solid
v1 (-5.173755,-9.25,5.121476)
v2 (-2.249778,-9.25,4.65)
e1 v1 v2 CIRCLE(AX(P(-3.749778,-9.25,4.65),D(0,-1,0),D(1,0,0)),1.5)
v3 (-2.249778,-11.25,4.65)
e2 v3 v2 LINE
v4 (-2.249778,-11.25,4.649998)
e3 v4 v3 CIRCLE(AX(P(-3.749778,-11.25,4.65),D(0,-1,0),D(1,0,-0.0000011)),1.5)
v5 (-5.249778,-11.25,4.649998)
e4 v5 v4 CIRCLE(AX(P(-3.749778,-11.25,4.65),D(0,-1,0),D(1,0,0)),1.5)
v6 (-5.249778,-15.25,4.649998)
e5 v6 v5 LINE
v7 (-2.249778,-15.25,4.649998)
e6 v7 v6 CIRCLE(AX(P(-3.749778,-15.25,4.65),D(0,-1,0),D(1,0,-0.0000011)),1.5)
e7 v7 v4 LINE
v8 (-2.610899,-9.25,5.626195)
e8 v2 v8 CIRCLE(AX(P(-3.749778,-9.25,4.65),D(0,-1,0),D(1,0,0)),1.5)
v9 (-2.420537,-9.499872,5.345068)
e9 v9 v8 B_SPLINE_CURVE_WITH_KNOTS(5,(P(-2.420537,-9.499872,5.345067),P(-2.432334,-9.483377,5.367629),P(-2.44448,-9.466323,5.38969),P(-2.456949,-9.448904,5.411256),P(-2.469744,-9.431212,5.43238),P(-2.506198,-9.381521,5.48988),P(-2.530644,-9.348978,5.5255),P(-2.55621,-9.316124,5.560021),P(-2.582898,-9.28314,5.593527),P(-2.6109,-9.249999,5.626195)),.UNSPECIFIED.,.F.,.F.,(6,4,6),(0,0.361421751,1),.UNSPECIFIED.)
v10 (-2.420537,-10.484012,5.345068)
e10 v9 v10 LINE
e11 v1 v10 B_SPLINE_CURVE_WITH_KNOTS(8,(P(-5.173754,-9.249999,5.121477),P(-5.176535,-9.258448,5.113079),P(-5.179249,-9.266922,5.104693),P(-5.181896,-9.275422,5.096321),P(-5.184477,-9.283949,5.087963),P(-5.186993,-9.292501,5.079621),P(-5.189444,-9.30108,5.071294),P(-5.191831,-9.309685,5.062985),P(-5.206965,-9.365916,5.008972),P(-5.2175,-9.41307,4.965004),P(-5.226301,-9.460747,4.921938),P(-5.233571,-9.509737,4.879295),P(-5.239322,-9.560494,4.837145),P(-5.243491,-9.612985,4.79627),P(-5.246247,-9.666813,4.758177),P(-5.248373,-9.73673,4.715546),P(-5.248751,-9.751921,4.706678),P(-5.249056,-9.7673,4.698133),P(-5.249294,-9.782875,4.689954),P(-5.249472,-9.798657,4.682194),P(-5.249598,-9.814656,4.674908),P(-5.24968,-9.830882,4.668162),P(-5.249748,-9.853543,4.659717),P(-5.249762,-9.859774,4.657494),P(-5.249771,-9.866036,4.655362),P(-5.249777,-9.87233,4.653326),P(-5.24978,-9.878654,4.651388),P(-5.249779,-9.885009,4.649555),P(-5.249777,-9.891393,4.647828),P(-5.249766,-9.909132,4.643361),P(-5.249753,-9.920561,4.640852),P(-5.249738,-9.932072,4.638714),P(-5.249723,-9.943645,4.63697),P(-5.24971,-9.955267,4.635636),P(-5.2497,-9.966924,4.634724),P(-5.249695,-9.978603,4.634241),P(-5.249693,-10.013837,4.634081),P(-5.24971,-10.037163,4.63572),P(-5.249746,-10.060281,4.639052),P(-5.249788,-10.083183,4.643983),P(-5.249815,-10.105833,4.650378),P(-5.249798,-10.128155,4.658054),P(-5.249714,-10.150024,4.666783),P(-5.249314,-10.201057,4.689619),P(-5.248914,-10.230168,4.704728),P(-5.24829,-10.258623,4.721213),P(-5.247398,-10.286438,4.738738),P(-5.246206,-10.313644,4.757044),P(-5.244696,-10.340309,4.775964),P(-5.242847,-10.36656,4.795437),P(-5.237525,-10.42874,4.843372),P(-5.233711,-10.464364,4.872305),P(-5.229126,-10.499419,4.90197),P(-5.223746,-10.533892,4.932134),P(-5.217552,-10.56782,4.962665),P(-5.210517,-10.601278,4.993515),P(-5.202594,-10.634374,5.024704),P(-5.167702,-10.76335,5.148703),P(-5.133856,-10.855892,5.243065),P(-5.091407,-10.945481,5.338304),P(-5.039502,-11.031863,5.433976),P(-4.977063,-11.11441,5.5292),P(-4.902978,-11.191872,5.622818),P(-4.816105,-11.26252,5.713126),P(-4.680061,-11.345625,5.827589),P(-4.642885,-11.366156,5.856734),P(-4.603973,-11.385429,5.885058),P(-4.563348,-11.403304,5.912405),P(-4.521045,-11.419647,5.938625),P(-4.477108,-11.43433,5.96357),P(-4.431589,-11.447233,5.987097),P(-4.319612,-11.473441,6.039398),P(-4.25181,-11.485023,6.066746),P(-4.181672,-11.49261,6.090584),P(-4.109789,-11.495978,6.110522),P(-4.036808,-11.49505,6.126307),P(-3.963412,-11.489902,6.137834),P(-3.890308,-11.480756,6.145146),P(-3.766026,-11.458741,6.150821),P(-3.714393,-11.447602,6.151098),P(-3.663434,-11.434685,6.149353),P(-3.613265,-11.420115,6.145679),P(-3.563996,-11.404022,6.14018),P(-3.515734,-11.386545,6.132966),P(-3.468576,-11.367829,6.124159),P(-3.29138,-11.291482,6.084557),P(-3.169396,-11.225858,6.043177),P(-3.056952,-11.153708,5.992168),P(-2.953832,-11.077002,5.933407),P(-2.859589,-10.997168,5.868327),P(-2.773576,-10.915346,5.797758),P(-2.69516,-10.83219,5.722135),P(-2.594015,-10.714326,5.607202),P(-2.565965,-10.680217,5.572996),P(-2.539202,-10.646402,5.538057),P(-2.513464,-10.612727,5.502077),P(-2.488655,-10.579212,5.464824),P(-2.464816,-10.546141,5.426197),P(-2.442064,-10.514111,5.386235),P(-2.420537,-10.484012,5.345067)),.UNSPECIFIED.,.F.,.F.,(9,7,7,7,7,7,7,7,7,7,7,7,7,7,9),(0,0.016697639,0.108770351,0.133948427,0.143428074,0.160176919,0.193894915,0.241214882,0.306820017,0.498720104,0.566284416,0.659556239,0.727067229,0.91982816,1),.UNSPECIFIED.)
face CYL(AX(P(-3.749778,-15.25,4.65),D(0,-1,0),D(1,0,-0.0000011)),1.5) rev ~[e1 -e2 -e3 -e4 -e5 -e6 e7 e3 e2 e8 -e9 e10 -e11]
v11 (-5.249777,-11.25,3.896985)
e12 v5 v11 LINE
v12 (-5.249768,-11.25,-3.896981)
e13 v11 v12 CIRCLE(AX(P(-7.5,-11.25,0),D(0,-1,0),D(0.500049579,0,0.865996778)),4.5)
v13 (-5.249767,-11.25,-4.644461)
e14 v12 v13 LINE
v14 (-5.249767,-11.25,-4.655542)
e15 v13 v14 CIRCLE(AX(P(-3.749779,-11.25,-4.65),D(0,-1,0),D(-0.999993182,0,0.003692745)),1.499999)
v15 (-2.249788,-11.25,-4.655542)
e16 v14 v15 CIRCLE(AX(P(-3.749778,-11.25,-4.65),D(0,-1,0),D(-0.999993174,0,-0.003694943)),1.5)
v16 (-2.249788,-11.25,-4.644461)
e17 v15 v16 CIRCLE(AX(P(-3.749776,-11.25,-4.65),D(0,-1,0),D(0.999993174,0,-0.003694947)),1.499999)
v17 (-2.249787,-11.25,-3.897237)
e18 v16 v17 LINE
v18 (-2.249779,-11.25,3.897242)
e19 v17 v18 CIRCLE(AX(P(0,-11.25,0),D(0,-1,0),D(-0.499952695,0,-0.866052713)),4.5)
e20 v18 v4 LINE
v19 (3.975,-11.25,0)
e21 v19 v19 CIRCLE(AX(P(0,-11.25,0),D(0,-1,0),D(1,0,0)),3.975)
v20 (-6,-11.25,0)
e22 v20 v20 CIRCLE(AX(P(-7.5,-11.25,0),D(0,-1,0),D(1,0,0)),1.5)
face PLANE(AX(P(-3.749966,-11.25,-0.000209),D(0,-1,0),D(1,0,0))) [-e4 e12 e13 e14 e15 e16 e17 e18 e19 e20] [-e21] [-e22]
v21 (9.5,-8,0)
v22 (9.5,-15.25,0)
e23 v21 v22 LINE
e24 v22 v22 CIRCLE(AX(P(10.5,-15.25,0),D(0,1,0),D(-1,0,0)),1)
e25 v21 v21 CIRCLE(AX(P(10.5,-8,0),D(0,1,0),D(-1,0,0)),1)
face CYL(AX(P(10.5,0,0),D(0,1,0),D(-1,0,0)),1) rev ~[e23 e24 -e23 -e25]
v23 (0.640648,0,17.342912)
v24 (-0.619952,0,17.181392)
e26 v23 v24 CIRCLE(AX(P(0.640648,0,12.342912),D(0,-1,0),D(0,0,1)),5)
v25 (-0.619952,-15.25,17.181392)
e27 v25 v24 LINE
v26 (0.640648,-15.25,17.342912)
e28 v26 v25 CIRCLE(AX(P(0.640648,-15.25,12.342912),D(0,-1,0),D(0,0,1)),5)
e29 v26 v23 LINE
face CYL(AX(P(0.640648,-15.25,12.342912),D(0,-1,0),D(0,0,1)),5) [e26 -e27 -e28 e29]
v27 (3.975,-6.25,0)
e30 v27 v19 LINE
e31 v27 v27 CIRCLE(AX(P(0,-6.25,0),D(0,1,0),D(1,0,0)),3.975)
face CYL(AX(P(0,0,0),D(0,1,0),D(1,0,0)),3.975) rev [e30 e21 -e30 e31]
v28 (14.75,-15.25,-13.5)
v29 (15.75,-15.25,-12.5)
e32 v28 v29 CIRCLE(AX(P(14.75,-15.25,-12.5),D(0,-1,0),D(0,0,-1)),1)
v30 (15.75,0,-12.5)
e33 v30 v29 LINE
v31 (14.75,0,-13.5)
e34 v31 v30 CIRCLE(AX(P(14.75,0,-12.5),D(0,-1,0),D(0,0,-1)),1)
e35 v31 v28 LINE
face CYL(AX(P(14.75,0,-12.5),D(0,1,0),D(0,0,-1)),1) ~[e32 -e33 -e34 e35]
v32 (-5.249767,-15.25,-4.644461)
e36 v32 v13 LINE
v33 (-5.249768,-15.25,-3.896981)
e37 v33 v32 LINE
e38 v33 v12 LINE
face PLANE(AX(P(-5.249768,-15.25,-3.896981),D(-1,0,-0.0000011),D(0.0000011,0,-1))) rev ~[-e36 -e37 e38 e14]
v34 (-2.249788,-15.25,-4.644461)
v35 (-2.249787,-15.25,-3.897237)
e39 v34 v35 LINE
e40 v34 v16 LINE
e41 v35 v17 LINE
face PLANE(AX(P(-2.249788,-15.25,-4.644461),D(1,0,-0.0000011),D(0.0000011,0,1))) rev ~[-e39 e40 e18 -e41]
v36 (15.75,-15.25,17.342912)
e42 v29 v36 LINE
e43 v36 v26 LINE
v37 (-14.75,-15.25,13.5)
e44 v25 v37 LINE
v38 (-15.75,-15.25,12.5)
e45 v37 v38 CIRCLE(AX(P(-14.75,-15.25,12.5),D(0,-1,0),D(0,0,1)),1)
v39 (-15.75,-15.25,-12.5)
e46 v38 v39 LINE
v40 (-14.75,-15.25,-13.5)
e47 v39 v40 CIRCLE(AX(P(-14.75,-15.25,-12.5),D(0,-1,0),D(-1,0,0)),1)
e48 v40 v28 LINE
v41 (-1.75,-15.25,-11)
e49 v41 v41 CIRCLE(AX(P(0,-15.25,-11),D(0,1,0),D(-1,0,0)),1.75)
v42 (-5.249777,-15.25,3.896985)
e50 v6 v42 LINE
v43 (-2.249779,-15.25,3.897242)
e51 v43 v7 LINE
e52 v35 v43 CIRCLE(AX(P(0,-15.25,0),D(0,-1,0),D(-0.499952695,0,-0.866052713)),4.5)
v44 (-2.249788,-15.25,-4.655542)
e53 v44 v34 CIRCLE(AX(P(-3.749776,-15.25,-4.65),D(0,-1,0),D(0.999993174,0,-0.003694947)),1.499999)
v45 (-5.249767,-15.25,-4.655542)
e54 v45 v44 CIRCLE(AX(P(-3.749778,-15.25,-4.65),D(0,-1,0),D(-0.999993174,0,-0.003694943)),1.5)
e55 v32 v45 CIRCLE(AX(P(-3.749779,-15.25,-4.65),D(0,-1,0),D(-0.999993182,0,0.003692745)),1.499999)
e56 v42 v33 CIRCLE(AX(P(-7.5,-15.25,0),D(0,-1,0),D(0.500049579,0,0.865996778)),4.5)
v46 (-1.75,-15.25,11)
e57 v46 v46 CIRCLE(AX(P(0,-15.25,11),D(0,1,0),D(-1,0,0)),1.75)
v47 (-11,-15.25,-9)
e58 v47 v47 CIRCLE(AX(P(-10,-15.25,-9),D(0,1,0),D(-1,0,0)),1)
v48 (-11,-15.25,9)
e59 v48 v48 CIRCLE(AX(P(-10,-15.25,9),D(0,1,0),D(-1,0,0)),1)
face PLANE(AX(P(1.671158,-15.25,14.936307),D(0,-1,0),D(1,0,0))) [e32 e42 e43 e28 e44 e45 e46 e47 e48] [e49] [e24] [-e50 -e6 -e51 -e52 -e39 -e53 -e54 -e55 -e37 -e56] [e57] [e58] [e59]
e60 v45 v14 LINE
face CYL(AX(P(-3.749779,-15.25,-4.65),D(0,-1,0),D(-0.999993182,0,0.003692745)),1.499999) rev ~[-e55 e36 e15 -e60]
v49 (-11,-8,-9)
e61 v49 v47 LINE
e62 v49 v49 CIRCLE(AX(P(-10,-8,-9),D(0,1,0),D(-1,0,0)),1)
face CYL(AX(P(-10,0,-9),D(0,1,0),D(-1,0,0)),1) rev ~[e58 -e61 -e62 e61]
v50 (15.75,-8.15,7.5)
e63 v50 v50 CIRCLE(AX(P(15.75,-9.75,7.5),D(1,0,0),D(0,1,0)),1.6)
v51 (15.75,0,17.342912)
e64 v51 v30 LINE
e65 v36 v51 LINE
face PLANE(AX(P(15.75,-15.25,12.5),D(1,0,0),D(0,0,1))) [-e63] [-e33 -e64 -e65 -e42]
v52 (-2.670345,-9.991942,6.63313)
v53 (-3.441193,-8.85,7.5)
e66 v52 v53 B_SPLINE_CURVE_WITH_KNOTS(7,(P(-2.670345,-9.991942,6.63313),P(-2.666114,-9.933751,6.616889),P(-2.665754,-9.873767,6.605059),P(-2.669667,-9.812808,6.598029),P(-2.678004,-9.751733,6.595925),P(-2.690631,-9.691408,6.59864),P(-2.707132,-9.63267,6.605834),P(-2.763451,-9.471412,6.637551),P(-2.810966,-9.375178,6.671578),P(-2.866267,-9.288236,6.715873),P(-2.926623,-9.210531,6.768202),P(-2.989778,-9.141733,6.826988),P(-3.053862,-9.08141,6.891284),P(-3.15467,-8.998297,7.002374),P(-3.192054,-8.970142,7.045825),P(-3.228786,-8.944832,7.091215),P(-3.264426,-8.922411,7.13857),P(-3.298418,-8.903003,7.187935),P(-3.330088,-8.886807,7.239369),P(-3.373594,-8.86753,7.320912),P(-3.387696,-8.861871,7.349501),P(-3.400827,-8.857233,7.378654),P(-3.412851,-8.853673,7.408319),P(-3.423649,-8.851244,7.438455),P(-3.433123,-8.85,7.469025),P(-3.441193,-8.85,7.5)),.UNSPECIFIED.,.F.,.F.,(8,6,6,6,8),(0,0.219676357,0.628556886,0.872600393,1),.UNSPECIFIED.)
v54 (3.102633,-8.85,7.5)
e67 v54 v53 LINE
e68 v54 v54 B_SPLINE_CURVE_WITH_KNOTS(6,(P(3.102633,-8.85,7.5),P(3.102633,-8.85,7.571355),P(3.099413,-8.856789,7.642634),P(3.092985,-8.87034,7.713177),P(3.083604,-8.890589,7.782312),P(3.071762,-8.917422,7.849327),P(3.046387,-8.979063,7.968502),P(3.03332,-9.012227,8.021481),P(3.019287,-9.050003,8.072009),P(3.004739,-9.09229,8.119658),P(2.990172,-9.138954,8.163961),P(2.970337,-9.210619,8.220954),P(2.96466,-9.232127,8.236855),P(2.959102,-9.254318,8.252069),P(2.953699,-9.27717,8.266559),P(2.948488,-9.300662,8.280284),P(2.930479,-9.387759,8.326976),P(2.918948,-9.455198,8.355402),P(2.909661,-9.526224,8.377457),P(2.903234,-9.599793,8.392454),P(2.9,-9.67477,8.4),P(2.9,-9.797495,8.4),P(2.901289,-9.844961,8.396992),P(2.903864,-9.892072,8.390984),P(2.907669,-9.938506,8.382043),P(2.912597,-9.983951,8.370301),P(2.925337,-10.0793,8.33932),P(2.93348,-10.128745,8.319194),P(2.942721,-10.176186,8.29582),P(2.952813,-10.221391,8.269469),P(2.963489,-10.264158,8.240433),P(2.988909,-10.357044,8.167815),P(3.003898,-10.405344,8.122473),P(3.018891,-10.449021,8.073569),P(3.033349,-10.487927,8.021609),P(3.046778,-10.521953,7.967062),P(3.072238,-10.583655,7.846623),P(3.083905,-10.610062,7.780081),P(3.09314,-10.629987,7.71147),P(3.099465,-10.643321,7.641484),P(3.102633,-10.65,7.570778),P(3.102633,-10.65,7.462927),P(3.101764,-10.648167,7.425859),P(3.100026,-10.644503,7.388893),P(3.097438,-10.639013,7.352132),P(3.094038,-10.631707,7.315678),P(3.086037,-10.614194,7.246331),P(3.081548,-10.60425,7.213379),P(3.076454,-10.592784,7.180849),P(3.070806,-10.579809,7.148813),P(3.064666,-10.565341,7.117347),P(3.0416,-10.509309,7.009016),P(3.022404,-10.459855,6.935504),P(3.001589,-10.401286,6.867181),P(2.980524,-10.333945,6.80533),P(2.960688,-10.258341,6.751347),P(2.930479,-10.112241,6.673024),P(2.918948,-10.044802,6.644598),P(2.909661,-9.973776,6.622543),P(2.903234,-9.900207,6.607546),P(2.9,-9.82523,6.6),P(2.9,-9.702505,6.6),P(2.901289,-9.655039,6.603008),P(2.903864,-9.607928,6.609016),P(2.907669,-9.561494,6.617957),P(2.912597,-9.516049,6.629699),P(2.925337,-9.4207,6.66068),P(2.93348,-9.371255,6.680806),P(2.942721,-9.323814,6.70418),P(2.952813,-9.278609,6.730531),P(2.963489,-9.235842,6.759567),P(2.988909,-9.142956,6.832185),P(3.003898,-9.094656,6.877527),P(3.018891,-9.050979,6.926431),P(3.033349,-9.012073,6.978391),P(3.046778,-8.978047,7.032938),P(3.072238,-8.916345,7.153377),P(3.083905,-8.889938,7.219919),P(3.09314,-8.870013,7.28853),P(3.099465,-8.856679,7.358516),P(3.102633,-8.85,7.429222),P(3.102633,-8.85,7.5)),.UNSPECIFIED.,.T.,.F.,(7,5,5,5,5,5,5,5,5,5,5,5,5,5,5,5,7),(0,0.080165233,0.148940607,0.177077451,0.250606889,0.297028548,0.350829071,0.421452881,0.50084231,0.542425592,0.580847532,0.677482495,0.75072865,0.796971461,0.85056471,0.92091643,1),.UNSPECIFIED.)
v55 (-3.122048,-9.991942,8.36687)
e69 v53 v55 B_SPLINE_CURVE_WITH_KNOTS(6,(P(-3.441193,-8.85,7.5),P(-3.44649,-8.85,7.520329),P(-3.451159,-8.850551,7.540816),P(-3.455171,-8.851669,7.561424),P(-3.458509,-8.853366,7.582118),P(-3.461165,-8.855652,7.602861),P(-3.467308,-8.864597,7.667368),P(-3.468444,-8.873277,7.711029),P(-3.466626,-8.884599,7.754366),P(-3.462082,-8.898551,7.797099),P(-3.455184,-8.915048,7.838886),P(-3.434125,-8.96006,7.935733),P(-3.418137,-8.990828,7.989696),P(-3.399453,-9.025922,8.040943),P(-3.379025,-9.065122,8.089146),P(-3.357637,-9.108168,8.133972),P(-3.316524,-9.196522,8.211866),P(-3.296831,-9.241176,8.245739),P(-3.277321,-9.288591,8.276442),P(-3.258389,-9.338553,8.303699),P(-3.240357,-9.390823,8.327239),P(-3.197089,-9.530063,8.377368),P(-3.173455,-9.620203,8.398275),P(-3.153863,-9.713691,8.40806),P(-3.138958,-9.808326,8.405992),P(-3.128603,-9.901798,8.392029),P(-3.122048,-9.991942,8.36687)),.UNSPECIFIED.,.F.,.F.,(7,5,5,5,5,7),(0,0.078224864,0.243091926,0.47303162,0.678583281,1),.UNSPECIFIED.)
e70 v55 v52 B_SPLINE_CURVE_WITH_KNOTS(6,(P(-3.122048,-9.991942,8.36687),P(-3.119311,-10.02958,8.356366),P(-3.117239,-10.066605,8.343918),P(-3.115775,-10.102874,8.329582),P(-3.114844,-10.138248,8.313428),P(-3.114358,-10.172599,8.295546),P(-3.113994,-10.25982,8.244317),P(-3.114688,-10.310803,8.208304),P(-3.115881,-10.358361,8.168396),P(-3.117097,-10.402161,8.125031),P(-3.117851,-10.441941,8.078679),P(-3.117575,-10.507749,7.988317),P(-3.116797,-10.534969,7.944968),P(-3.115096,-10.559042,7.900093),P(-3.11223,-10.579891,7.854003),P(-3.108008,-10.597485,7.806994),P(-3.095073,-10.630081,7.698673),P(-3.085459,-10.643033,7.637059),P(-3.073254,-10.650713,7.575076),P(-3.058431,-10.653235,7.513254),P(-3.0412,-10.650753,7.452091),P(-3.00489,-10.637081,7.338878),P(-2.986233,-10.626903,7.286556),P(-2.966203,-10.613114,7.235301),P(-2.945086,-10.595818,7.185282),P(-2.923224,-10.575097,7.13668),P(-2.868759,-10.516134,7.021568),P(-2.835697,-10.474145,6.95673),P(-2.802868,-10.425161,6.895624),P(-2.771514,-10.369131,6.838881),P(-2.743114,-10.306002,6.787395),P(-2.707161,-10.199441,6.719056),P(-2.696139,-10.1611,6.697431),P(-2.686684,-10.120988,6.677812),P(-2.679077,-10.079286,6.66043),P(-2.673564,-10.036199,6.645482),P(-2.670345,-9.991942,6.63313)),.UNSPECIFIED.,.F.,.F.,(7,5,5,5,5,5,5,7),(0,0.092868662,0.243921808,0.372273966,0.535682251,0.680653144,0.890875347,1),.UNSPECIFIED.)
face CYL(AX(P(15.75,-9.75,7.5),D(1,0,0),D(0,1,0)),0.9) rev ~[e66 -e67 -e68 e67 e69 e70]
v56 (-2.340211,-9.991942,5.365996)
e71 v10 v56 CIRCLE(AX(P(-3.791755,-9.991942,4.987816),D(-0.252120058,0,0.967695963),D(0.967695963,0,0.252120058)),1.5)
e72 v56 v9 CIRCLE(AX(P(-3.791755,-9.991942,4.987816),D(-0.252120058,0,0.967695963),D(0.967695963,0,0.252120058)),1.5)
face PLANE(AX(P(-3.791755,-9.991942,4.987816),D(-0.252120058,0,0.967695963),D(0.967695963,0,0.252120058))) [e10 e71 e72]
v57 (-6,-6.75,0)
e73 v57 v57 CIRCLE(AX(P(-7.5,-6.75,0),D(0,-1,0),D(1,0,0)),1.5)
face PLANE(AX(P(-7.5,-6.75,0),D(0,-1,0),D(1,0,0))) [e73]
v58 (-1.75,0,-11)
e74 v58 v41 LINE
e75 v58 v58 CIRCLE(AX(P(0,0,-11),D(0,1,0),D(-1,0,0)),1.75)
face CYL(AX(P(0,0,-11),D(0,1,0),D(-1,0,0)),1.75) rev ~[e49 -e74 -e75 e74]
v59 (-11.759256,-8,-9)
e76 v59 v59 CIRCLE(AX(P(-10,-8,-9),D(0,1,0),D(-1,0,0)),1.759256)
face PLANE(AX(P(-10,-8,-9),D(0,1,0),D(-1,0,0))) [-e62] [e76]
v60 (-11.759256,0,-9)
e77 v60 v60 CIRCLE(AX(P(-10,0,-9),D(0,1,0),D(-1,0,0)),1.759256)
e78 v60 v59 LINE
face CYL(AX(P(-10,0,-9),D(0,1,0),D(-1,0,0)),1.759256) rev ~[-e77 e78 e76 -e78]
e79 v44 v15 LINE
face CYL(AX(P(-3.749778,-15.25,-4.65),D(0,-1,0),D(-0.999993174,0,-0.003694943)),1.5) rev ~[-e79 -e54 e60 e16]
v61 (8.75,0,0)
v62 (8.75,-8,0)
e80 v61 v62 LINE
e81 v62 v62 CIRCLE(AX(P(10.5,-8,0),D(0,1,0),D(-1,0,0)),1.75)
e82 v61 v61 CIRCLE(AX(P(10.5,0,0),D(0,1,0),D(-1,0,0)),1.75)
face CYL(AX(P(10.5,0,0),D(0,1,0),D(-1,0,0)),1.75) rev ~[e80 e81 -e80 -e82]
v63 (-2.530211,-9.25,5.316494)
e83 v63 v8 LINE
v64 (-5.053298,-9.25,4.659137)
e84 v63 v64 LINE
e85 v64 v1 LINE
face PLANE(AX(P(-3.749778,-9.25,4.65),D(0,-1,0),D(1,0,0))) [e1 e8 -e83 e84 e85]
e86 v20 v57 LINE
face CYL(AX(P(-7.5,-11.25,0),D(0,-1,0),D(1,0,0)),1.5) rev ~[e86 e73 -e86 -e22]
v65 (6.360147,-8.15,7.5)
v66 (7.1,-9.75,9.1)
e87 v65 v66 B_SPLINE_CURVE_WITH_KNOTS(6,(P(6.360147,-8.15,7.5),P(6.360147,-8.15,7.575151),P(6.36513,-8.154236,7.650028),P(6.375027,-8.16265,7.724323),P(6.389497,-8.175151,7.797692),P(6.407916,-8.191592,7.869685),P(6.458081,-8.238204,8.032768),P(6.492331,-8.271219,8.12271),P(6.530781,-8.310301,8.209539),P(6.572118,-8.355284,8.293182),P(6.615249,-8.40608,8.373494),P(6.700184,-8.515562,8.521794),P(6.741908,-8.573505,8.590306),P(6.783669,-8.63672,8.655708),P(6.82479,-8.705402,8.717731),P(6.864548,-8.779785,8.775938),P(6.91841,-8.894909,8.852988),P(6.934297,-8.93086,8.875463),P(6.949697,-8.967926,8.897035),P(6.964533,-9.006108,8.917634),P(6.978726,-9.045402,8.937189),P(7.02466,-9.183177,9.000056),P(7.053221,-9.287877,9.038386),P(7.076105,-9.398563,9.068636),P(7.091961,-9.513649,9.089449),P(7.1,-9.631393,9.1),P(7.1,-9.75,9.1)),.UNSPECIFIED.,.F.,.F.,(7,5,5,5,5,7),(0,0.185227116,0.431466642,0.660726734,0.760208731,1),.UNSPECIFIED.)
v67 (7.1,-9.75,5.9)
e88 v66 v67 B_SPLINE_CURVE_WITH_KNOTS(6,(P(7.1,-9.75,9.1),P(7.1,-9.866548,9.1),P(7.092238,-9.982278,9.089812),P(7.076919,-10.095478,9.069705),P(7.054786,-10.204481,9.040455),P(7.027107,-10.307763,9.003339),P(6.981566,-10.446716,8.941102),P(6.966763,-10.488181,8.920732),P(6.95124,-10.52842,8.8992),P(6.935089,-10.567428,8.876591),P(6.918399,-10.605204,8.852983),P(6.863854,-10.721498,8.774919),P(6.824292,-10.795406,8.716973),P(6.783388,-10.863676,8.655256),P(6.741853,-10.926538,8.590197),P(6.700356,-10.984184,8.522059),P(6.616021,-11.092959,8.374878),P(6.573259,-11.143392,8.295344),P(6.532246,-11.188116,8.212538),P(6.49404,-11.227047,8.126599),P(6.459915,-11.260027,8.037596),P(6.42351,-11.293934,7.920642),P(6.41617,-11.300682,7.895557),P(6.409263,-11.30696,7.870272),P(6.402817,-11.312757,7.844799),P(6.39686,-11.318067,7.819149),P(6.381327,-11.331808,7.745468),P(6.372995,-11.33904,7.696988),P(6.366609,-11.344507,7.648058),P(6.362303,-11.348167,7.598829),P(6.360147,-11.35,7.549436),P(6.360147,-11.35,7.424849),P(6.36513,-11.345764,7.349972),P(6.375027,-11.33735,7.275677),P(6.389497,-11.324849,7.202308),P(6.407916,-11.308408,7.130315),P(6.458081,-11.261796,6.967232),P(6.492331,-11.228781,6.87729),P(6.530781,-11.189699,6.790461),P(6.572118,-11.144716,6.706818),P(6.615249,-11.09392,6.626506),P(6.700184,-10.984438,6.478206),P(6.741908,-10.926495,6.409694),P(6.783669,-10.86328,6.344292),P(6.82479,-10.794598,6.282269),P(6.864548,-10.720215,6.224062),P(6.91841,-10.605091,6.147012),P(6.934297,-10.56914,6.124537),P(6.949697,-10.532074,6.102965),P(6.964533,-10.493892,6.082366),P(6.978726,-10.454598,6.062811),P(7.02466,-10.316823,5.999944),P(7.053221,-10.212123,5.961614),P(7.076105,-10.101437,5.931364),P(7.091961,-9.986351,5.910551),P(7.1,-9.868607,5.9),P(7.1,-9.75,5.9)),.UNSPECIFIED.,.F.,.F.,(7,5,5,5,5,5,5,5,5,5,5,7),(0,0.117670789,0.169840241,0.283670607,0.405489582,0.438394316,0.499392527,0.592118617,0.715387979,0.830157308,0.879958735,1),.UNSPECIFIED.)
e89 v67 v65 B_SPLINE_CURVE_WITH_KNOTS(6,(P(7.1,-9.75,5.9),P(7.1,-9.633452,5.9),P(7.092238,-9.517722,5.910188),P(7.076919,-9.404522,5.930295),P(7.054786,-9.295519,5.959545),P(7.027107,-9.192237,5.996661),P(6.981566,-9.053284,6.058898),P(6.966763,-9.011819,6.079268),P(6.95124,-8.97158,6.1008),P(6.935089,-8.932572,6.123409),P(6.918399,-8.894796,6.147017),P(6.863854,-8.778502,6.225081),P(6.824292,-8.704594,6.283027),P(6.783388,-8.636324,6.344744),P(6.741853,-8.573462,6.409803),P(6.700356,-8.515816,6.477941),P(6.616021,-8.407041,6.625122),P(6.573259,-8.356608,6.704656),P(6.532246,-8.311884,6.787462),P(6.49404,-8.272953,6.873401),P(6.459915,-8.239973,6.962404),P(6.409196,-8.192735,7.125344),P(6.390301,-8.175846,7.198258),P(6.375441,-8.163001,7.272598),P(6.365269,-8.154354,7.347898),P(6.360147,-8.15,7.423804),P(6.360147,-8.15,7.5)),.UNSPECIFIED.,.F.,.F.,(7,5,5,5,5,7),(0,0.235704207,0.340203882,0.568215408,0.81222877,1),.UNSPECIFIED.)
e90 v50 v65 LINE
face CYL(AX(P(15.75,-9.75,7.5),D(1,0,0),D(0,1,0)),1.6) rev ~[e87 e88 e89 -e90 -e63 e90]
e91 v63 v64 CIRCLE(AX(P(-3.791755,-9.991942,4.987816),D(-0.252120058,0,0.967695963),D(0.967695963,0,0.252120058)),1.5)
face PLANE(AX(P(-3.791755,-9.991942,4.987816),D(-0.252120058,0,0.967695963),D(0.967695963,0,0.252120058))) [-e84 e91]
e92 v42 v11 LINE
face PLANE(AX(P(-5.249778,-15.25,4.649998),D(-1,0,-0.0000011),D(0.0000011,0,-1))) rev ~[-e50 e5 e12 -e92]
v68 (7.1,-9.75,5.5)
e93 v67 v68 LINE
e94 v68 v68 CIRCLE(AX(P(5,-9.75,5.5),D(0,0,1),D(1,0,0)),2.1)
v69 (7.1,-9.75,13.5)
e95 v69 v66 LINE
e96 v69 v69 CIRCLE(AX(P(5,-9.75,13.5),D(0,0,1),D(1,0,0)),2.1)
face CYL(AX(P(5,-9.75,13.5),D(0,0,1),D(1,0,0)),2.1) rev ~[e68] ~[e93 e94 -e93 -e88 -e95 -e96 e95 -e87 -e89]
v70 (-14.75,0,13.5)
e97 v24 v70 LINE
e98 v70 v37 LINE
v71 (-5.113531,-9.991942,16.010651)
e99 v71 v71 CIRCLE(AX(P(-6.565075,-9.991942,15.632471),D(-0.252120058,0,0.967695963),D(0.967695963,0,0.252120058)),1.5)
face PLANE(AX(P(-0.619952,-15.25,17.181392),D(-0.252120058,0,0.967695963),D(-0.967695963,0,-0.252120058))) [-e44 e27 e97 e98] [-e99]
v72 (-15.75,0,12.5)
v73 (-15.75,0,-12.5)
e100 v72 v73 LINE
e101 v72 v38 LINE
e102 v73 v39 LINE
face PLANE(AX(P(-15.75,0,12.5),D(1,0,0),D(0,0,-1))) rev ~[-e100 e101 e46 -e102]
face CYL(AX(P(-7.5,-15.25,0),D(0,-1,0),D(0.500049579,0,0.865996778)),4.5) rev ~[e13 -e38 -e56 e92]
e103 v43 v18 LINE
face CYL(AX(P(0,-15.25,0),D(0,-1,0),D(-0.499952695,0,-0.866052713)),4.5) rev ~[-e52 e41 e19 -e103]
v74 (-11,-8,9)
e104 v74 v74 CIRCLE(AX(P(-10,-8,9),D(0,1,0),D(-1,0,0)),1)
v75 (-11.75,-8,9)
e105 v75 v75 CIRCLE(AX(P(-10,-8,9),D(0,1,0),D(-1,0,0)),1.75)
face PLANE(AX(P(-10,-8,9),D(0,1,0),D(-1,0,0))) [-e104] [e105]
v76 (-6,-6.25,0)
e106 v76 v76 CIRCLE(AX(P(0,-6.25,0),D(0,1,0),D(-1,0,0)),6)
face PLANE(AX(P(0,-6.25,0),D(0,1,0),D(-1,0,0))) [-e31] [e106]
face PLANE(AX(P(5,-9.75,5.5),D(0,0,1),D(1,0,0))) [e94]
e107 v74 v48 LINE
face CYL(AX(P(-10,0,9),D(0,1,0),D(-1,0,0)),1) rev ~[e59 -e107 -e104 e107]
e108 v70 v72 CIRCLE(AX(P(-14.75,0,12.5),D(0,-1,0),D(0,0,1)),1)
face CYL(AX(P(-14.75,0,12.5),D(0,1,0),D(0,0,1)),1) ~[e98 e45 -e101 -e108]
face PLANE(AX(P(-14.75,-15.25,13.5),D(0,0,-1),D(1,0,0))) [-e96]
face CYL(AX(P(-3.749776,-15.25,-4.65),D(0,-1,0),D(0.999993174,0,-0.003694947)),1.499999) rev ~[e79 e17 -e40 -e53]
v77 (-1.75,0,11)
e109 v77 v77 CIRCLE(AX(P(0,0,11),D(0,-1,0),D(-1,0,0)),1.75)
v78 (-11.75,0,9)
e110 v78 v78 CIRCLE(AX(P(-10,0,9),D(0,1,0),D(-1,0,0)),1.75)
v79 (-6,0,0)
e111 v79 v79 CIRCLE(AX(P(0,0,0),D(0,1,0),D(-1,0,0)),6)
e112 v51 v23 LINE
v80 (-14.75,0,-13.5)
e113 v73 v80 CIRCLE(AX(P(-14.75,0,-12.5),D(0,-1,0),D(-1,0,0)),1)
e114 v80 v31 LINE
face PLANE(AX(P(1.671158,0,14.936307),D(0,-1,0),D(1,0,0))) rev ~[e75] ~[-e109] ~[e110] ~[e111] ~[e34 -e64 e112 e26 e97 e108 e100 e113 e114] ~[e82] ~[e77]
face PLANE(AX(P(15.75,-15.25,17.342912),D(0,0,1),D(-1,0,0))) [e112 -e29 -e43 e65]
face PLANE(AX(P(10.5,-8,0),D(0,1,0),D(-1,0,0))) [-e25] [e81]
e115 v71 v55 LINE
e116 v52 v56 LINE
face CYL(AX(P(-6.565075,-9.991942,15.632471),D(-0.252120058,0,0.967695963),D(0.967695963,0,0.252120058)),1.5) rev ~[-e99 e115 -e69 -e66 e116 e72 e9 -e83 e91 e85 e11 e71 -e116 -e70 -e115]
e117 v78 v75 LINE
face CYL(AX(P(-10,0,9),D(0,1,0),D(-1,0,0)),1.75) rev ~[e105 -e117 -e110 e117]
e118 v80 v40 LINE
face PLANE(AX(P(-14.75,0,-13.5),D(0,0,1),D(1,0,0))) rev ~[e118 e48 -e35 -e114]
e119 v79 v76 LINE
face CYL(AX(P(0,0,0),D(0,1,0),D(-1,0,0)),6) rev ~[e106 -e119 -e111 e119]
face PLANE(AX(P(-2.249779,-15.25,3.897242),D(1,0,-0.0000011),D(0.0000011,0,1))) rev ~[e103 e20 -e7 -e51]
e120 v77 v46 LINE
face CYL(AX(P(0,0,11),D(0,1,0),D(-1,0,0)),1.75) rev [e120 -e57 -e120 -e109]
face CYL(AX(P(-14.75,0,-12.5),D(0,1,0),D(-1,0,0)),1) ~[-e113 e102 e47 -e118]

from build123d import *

# Parameters (mm, degrees)
F0_R             = 6
F0_R_2           = 3.975
F1_DEPTH         = 15.25
F2_R             = 6
F2_R_2           = 3.975
F3_DEPTH         = 6.25
F4_R             = 3.975
F5_DEPTH         = 4
F6_R             = 1.5
F7_DEPTH         = 4.5
F8_R             = 1.75
F9_DEPTH         = 15.251
F10_R            = 1
F11_DEPTH        = 15.251
F11_COPIES_COUNT = 2
F11_COPIES_PITCH = 22.388613
F12_R            = 1.7592557298
F12_R_2          = 1
F12_R_3          = 1.75
F13_DEPTH        = 8
F14_R            = 2.1
F15_DEPTH        = 8
F17_DEPTH        = 2
F18_R            = 1.6
F19_DEPTH        = 12
F20_R            = 0.9
F21_DEPTH        = 20
F23_DEPTH        = 15.25
F24_R            = 1.5
F25_DEPTH        = 11


# Not quite as in the source:
# - a pattern or mirror of a feature is missing from the dataset's text; its kind, count and spacing are read off the source's solid
# - a feature names something its author has since deleted; it is built from what else it names


with BuildPart() as f1:
    # F0 (on Front) → F1 (new body)
    with BuildSketch(Plane.XZ):
        with BuildLine():
            Line((-14.75, -13.5), (14.75, -13.5))
            ThreePointArc((14.75, -13.5), (15.4571067812, -13.2071067812), (15.75, -12.5))
            Line((15.75, -12.5), (15.75, 12.5))
            ThreePointArc((15.75, 12.5), (15.4571067812, 13.2071067812), (14.75, 13.5))
            Line((14.75, 13.5), (-14.75, 13.5))
            ThreePointArc((-14.75, 13.5), (-15.4571067812, 13.2071067812), (-15.75, 12.5))
            Line((-15.75, 12.5), (-15.75, -12.5))
            ThreePointArc((-15.75, -12.5), (-15.4571067812, -13.2071067812), (-14.75, -13.5))
        make_face()
        Circle(F0_R, mode=Mode.SUBTRACT)
        Circle(F0_R)
        Circle(F0_R_2, mode=Mode.SUBTRACT)
    extrude(amount=F1_DEPTH)

    # F2 (on face) → F3 (cut)
    with BuildSketch(Plane(origin=(0, 0, 0), x_dir=(-1, 0, 0), z_dir=(0, 1, 0))):
        Circle(F2_R)
        Circle(F2_R_2, mode=Mode.SUBTRACT)
    extrude(amount=-F3_DEPTH, mode=Mode.SUBTRACT)

    # F4 (on face) → F5 (cut)
    with BuildSketch(Plane.XZ.offset(15.25)):
        with BuildLine():
            Line((-2.2497879514, -4.6444608866), (-2.2497871292, -3.8972372103))
            ThreePointArc((-2.2497871292, -3.8972372103), (4.5, -4.9516e-06), (-2.2497785524, 3.8972421615))
            Line((-2.2497785524, 3.8972421615), (-2.2497777241, 4.6499983495))
            ThreePointArc((-2.2497777241, 4.6499983495), (-3.7497777241, 6.15), (-5.2497777241, 4.6499983495))
            Line((-5.2497777241, 4.6499983495), (-5.2497768955, 3.8969854991))
            ThreePointArc((-5.2497768955, 3.8969854991), (-12, -4.9516e-06), (-5.2497683193, -3.8969805469))
            Line((-5.2497683193, -3.8969805469), (-5.2497674968, -4.6444608866))
            ThreePointArc((-5.2497674968, -4.6444608866), (-5.2497777241, -4.6500016505), (-5.2497674846, -4.6555424145))
            ThreePointArc((-5.2497674846, -4.6555424145), (-3.7497777241, -6.15), (-2.2497879636, -4.6555424145))
            ThreePointArc((-2.2497879636, -4.6555424145), (-2.2497777241, -4.6500016505), (-2.2497879514, -4.6444608866))
        make_face()
        Circle(F4_R, mode=Mode.SUBTRACT)
    extrude(amount=-F5_DEPTH, mode=Mode.SUBTRACT)

    # F6 (on face) → F7 (cut)
    with BuildSketch(Plane.XZ.offset(11.25)):
        with Locations((-7.5, 0)):
            Circle(F6_R)
    extrude(amount=-F7_DEPTH, mode=Mode.SUBTRACT)

    # F8 (on face) → F9 (cut, through all)
    with BuildSketch(Plane(origin=(0, 0, 0), x_dir=(-1, 0, 0), z_dir=(0, 1, 0))):
        with Locations((0, -11)):
            Circle(F8_R)
    f9 = extrude(amount=-F9_DEPTH, mode=Mode.SUBTRACT)

    # F9_copies: F9 across plane
    add(f9.mirror(Plane.XY), mode=Mode.SUBTRACT)

    # F10 (on face) → F11 (cut, through all)
    with BuildSketch(Plane(origin=(0, 0, 0), x_dir=(-1, 0, 0), z_dir=(0, 1, 0))):
        with Locations((-10.5, 0)):
            Circle(F10_R)
        with Locations((10, -9)):
            Circle(F10_R)
    f11 = extrude(amount=-F11_DEPTH, mode=Mode.SUBTRACT)

    # F11_copies: F11 ×2
    with Locations(*[Vector(-0.9156440302, 0, 0.401990062) * (i * F11_COPIES_PITCH) for i in range(1, F11_COPIES_COUNT)]):
        add(f11, mode=Mode.SUBTRACT)

    # F12 (on face) → F13 (cut)
    with BuildSketch(Plane(origin=(0, 0, 0), x_dir=(-1, 0, 0), z_dir=(0, 1, 0))):
        with Locations((10, -9)):
            Circle(F12_R)
        with Locations((10, -9)):
            Circle(F12_R_2, mode=Mode.SUBTRACT)
        with Locations((-10.5, 0)):
            Circle(F12_R_3)
        with Locations((-10.5, 0)):
            Circle(F12_R_2, mode=Mode.SUBTRACT)
        with Locations((10, 9)):
            Circle(F12_R_3)
        with Locations((9.9999998377, 8.9999999288)):
            Circle(F12_R_2, mode=Mode.SUBTRACT)
    extrude(amount=-F13_DEPTH, mode=Mode.SUBTRACT)

    # F14 (on face) → F15 (cut)
    with BuildSketch(Plane.XY.offset(13.5)):
        with Locations((5, -9.75)):
            Circle(F14_R)
    extrude(amount=-F15_DEPTH, mode=Mode.SUBTRACT)

    # F16 (on face) → F17 (cut)
    with BuildSketch(Plane.XZ.offset(11.25)):
        with BuildLine():
            ThreePointArc((-5.2497777241, 4.6499983495), (-3.7497768988, 3.15), (-2.2497777241, 4.65))
            ThreePointArc((-2.2497777241, 4.65), (-3.7497785494, 6.15), (-5.2497777241, 4.6499983495))
        make_face()
    extrude(amount=-F17_DEPTH, mode=Mode.SUBTRACT)

    # F18 (on face) → F19 (cut)
    with BuildSketch(Plane.YZ.offset(15.75)):
        with Locations((-9.75, 7.5)):
            Circle(F18_R)
    extrude(amount=-F19_DEPTH, mode=Mode.SUBTRACT)

    # F20 (on face) → F21 (cut)
    with BuildSketch(Plane.YZ.offset(15.75)):
        with Locations((-9.75, 7.5)):
            Circle(F20_R)
    extrude(amount=-F21_DEPTH, mode=Mode.SUBTRACT)

    # F22 (on face) → F23 (join, through all)
    with BuildSketch(Plane.XZ.offset(15.25)):
        with BuildLine():
            Line((-0.6199523885, 17.1813922581), (-14.75, 13.5))
            Line((-14.75, 13.5), (14.75, 13.5))
            ThreePointArc((14.75, 13.5), (15.4571067812, 13.2071067812), (15.75, 12.5))
            Line((15.75, 12.5), (15.75, 17.3429124444))
            Line((15.75, 17.3429124444), (0.6406479022, 17.3429124444))
            ThreePointArc((0.6406479022, 17.3429124444), (0.005194941, 17.3023680128), (-0.6199523885, 17.1813922581))
        make_face()
    extrude(amount=-F23_DEPTH)

    # F24 (on face) → F25 (cut)
    with BuildSketch(Plane(origin=(-4.2312468171, 0, 16.240518475), x_dir=(0.9676959627, 0, 0.2521200581), z_dir=(-0.2521200581, 0, 0.9676959627))):
        with Locations((-2.4117373396, -9.9919419736)):
            Circle(F24_R)
    extrude(amount=-F25_DEPTH, mode=Mode.SUBTRACT)


solid = f1.part
